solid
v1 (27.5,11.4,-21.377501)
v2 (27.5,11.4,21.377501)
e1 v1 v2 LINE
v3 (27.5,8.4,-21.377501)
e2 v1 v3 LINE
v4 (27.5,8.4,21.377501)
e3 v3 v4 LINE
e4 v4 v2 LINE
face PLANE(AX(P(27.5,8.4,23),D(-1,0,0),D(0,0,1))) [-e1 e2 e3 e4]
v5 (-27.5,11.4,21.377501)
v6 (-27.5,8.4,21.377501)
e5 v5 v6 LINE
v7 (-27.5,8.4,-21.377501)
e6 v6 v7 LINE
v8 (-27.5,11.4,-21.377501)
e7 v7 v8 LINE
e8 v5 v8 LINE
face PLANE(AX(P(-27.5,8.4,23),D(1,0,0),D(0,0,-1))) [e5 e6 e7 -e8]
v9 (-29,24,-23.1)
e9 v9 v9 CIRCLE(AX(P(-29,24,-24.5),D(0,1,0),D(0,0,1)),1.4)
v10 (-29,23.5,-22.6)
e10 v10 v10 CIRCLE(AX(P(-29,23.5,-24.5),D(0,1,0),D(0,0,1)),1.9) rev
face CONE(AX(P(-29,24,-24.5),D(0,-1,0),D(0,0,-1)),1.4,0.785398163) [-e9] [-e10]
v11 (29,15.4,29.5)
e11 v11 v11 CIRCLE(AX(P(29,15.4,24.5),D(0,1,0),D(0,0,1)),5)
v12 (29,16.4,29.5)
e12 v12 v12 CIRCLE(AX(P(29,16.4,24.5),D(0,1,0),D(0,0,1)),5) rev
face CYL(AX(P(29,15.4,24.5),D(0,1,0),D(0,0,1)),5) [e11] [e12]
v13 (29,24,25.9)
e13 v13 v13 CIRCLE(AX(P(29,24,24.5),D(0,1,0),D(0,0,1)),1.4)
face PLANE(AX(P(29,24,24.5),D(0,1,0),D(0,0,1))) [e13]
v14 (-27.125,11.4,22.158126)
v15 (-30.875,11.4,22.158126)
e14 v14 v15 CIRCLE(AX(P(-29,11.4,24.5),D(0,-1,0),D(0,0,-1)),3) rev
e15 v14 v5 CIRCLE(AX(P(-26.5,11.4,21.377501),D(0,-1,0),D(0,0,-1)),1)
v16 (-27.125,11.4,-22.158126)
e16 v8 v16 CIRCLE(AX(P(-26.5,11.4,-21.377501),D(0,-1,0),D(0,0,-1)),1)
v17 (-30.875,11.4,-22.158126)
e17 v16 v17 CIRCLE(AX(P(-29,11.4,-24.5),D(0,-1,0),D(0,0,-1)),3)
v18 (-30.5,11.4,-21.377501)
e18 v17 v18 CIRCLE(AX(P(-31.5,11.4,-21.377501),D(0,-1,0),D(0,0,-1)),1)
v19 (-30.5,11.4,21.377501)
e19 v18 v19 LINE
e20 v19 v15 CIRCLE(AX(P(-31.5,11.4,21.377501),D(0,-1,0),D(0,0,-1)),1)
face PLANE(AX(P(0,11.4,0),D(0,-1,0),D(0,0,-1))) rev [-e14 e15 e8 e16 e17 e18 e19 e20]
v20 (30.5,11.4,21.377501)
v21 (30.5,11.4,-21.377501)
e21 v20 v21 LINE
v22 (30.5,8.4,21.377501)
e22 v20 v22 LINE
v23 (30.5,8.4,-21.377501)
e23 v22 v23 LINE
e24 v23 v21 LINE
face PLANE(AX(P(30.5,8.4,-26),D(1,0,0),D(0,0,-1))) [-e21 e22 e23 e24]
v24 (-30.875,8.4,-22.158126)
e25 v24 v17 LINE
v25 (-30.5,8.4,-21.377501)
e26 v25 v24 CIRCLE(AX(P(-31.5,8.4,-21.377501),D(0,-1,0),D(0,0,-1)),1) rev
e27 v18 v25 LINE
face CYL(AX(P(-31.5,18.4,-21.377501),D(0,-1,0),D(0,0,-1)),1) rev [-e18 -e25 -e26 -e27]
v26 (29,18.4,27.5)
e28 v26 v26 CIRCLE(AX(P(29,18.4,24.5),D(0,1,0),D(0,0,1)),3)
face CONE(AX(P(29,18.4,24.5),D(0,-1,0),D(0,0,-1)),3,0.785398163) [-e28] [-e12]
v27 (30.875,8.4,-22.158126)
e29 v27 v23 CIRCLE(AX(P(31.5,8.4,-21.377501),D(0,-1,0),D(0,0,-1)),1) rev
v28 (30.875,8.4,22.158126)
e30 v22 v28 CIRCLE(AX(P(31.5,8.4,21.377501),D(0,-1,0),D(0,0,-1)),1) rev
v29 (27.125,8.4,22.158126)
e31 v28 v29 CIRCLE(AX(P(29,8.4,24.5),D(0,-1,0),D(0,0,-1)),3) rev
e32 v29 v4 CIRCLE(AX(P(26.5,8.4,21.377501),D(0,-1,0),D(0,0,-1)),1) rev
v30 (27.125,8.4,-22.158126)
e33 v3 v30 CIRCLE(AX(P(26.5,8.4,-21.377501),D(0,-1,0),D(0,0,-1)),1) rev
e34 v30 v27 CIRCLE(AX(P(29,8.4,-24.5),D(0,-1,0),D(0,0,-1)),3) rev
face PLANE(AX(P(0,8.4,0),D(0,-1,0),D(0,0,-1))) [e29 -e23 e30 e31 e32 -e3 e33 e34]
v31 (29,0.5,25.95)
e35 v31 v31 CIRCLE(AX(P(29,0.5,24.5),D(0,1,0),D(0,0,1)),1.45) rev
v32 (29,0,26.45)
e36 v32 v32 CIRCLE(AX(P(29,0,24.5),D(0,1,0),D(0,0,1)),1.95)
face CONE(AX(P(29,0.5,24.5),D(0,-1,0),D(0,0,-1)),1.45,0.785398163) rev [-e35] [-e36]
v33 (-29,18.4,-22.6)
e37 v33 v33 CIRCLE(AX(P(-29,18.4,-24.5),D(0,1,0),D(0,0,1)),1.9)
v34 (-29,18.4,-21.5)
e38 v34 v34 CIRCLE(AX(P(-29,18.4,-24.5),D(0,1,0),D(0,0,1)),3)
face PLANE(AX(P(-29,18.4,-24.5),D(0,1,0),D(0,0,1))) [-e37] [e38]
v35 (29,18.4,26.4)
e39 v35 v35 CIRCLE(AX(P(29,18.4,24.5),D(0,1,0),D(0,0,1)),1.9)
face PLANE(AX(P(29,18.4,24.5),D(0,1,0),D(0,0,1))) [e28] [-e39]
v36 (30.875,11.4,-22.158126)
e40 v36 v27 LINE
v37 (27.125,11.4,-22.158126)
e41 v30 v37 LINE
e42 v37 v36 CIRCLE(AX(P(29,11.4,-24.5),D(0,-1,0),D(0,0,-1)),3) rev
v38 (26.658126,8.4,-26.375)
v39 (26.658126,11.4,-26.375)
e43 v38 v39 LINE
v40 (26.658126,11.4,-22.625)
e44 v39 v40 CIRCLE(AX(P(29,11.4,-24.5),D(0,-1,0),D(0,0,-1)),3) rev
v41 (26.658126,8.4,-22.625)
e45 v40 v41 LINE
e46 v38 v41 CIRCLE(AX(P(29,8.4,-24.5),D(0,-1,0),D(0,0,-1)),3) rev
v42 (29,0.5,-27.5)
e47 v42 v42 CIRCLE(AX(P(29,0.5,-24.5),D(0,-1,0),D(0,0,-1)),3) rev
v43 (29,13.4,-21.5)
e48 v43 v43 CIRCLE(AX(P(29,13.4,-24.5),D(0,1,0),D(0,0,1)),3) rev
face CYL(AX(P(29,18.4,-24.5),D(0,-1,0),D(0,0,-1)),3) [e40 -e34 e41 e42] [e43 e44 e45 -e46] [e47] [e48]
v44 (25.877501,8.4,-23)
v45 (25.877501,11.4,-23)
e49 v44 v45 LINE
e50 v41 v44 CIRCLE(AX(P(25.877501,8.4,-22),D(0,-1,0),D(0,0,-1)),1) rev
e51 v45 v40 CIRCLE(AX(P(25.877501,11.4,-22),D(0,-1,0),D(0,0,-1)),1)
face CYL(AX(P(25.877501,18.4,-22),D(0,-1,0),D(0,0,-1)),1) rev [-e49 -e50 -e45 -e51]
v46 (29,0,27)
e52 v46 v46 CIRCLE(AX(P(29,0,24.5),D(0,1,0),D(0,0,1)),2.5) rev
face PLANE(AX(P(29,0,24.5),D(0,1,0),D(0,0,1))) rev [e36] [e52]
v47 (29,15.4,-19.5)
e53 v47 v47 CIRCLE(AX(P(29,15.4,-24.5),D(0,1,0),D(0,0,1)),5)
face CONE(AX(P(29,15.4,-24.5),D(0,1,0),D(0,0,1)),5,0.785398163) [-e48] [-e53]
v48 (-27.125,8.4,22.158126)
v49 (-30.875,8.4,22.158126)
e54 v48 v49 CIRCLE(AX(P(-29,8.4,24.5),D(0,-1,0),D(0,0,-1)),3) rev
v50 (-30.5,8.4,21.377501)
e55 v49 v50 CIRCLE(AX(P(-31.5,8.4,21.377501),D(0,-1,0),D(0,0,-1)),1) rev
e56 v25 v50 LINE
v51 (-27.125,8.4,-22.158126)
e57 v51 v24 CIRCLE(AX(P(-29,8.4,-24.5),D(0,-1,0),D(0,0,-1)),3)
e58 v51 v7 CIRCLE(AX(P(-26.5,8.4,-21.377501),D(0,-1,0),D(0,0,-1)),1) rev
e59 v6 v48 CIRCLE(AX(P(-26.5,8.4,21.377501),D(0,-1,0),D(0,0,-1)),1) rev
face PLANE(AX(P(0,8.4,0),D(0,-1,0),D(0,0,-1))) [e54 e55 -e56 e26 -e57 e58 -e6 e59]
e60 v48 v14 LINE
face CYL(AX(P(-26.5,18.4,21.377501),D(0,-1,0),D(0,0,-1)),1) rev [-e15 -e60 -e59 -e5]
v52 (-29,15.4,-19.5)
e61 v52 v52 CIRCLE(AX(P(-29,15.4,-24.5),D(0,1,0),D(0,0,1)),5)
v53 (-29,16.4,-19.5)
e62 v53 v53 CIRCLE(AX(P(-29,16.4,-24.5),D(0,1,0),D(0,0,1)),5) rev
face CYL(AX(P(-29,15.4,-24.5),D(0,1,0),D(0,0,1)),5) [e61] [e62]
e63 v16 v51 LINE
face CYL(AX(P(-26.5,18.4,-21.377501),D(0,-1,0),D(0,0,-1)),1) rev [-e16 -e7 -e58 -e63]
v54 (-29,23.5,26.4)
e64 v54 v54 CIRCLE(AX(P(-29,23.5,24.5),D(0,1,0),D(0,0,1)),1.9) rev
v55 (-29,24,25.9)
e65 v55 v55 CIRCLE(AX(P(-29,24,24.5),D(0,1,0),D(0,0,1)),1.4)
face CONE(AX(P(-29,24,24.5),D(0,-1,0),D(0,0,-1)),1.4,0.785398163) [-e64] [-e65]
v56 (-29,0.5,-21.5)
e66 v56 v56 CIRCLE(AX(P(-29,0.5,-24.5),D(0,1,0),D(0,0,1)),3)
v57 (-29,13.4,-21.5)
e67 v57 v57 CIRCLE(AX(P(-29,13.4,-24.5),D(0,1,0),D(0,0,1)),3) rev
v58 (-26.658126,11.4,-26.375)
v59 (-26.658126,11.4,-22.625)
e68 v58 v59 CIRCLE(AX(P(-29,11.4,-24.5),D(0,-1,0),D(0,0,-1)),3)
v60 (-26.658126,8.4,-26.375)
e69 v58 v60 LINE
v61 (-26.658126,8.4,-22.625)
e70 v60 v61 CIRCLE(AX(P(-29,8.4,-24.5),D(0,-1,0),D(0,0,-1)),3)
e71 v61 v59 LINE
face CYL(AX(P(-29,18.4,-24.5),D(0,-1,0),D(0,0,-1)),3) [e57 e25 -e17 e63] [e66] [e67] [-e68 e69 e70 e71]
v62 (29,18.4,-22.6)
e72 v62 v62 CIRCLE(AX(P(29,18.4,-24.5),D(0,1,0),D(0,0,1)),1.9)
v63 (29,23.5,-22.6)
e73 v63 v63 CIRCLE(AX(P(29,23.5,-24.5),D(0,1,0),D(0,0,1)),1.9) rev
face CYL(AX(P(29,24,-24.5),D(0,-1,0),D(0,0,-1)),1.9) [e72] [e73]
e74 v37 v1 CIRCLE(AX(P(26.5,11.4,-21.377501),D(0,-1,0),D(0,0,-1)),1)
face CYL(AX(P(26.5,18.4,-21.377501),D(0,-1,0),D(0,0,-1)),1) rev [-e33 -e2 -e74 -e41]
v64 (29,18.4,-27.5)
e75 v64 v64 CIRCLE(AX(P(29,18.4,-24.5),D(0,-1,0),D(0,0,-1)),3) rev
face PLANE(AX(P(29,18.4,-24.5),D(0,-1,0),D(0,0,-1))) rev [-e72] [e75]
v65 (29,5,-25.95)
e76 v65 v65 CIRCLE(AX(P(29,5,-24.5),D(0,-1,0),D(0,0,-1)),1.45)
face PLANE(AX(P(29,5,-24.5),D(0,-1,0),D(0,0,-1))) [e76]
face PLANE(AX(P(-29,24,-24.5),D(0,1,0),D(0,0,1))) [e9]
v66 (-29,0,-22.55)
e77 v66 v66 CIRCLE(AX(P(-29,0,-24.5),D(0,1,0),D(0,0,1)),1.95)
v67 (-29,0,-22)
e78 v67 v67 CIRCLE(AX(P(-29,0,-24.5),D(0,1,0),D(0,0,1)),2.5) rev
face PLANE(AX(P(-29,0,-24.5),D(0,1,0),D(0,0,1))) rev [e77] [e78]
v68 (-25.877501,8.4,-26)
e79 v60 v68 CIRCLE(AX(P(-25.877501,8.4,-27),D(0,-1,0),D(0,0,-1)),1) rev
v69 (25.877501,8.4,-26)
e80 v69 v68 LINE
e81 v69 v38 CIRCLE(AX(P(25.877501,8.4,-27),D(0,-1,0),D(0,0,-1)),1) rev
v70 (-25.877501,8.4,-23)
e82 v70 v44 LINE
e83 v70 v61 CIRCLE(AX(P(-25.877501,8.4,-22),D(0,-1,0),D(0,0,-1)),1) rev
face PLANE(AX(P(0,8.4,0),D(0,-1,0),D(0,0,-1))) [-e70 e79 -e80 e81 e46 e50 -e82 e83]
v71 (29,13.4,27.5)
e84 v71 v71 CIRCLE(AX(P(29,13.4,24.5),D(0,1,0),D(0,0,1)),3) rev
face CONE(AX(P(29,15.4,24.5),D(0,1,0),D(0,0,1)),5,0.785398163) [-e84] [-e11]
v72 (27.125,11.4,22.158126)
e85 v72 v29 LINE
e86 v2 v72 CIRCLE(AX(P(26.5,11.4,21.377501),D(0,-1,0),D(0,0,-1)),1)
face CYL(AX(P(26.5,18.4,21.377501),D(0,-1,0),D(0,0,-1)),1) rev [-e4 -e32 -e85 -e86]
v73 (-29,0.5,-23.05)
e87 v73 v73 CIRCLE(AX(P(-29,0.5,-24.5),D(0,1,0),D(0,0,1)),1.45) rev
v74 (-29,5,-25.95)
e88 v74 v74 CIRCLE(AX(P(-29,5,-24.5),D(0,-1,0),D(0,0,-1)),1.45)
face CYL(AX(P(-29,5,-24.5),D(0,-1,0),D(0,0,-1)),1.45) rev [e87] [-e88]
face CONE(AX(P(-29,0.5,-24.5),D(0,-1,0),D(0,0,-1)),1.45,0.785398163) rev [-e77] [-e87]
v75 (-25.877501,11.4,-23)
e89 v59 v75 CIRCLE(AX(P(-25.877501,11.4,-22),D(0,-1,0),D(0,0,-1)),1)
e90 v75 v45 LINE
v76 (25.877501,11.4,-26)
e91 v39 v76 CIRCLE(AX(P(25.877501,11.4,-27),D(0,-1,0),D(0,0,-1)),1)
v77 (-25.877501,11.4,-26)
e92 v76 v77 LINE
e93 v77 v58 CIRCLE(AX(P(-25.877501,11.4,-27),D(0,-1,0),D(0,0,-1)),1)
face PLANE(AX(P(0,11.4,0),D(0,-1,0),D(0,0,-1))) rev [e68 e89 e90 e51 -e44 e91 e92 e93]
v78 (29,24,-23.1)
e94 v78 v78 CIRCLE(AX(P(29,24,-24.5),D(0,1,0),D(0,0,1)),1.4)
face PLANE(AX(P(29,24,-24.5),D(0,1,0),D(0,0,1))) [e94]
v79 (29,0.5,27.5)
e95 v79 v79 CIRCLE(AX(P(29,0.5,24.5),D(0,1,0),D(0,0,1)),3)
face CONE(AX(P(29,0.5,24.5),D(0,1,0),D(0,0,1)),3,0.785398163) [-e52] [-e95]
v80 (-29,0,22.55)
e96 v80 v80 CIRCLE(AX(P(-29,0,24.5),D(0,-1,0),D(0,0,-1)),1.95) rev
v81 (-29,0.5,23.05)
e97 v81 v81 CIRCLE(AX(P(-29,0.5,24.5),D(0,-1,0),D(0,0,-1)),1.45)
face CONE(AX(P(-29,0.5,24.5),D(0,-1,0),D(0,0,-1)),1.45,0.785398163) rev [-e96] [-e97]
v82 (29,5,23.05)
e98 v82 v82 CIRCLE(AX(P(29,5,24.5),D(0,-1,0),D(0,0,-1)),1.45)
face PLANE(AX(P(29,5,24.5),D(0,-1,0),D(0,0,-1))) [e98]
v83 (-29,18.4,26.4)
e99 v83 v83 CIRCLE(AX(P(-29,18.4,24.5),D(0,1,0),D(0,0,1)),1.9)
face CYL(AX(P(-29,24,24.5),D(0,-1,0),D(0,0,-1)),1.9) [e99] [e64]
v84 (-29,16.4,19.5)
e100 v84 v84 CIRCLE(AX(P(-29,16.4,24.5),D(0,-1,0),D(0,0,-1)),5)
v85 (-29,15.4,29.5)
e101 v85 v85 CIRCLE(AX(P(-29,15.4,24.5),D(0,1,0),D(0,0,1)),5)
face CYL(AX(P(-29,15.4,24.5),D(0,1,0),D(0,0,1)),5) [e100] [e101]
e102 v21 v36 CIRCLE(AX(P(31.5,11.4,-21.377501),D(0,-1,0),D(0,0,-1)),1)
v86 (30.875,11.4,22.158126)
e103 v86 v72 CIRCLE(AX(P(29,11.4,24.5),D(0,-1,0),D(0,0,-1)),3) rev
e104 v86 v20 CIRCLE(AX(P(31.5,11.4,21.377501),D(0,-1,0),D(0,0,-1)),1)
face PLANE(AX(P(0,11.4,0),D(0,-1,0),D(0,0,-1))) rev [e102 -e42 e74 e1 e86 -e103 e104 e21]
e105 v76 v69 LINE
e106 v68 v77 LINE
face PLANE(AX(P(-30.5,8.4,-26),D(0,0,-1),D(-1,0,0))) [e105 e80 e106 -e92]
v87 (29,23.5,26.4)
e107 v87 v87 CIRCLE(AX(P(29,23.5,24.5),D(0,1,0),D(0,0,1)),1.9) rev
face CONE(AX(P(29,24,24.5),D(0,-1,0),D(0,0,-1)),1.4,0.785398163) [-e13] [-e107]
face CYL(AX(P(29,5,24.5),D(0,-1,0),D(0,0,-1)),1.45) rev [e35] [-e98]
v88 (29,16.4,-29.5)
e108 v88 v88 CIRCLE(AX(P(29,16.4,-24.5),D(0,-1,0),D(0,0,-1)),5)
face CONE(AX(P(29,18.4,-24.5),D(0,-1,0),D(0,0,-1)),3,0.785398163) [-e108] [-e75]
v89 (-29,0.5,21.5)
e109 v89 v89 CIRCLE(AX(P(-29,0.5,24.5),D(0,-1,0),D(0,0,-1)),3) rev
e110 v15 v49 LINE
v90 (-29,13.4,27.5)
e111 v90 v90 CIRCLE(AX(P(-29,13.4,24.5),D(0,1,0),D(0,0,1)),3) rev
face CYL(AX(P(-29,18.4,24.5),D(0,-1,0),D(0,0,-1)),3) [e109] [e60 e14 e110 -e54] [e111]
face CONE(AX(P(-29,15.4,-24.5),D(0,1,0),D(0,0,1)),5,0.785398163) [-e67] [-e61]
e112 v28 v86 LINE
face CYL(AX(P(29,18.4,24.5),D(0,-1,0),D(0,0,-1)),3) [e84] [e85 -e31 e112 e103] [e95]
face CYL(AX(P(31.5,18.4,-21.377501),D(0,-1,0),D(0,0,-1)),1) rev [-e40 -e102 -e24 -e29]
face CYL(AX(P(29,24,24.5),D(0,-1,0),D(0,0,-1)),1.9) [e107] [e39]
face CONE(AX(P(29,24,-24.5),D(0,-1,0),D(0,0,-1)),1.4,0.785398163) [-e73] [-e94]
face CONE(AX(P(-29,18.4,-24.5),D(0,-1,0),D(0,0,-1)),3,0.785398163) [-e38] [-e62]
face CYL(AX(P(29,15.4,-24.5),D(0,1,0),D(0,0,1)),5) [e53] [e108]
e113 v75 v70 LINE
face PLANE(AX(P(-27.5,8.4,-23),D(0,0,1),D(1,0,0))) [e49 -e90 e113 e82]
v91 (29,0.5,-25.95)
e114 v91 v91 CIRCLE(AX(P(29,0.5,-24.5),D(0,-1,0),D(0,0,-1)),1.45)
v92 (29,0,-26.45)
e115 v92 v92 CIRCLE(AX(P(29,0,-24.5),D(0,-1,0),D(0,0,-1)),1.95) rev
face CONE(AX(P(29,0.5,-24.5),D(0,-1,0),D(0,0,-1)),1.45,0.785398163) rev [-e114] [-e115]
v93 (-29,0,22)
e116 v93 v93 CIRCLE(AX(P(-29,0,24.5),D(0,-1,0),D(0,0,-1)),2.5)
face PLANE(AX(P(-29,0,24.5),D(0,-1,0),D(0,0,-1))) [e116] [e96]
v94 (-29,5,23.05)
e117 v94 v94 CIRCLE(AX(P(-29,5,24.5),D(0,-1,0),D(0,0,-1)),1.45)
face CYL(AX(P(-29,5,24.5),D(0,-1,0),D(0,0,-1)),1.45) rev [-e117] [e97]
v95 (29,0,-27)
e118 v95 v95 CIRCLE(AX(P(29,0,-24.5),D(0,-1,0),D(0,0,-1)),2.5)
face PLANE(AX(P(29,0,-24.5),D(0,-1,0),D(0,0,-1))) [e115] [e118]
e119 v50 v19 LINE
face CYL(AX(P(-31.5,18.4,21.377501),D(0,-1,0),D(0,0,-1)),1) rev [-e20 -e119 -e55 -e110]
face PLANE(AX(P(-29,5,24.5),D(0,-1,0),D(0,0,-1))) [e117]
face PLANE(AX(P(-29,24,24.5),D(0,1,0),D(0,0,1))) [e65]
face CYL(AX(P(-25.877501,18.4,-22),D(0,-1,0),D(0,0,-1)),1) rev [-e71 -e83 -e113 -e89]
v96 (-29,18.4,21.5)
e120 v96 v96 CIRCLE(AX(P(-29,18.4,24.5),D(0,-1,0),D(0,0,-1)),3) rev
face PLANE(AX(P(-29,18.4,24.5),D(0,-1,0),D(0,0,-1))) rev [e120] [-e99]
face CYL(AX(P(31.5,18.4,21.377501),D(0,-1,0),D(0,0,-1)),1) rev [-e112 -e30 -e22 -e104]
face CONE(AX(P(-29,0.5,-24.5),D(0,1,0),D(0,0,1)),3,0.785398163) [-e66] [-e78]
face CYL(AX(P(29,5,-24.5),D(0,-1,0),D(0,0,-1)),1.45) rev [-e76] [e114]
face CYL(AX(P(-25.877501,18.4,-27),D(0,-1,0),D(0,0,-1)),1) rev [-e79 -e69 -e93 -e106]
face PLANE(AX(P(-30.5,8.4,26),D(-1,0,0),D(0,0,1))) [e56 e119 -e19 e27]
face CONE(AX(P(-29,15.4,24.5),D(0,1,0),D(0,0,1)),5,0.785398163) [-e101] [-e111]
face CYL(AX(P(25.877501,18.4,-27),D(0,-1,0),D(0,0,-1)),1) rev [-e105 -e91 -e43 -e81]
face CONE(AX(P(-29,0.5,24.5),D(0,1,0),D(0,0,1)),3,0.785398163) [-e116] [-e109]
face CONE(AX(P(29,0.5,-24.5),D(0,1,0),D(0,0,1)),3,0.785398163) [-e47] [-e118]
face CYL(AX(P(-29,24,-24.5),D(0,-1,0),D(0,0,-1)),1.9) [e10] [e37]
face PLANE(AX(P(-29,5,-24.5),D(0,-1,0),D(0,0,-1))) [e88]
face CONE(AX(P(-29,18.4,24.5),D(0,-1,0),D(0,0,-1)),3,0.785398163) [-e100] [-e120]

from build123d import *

# Parameters (mm, degrees)
SKETCH_1_R          = 3
EXTRUDE_1_DEPTH     = 18.4
EXTRUDE_1_2_DEPTH   = 18.4
EXTRUDE_1_3_DEPTH   = 18.4
EXTRUDE_1_4_DEPTH   = 18.4
SKETCH_2_R          = 1.45
CUT_EXTRUDE_1_DEPTH = 5
SKETCH_3_R          = 5
EXTRUDE_2_DEPTH     = 3
EXTRUDE_START       = -7
EXTRUDE_3_DEPTH     = 3
CHAMFER_1_SIZE      = 0.5
SKETCH_5_R          = 1.9
EXTRUDE_4_DEPTH     = 5.6
CHAMFER_2_SIZE      = 0.5
CHAMFER_3_SIZE      = 2
FILLET_1_R          = 1


with BuildPart() as part:
    # 스케치1 → 보스-돌출1 (new body)
    with BuildSketch(Plane(origin=(0, 0, 0), x_dir=(1, 0, 0), z_dir=(0, 1, 0))):
        with Locations(Location((-29, 24.5, 0), (0, 0, 270))):
            Circle(SKETCH_1_R)
    extrude(amount=EXTRUDE_1_DEPTH)


with BuildPart() as body_2:
    # 스케치1 → Extrude 1 2 (new body)
    with BuildSketch(Plane(origin=(0, 0, 0), x_dir=(1, 0, 0), z_dir=(0, 1, 0))):
        with Locations(Location((29, 24.5, 0), (0, 0, 90))):
            Circle(SKETCH_1_R)
    extrude(amount=EXTRUDE_1_2_DEPTH)


with BuildPart() as body_3:
    # 스케치1 → Extrude 1 3 (new body)
    with BuildSketch(Plane(origin=(0, 0, 0), x_dir=(1, 0, 0), z_dir=(0, 1, 0))):
        with Locations(Location((-29, -24.5, 0), (0, 0, 90))):
            Circle(SKETCH_1_R)
    extrude(amount=EXTRUDE_1_3_DEPTH)


with BuildPart() as body_4:
    # 스케치1 → Extrude 1 4 (new body)
    with BuildSketch(Plane(origin=(0, 0, 0), x_dir=(1, 0, 0), z_dir=(0, 1, 0))):
        with Locations(Location((29, -24.5, 0), (0, 0, 270))):
            Circle(SKETCH_1_R)
    extrude(amount=EXTRUDE_1_4_DEPTH)


with BuildPart() as cut_extrude_1_tool:
    # 스케치2 → 컷-돌출1 (new body)
    with BuildSketch(Plane.XZ):
        with Locations(Location((-29, 24.5, 0), (0, 0, 270))):
            Circle(SKETCH_2_R)
        with Locations(Location((29, 24.5, 0), (0, 0, 270))):
            Circle(SKETCH_2_R)
        with Locations(Location((-29, -24.5, 0), (0, 0, 270))):
            Circle(SKETCH_2_R)
        with Locations(Location((29, -24.5, 0), (0, 0, 270))):
            Circle(SKETCH_2_R)
    extrude(amount=-CUT_EXTRUDE_1_DEPTH)


with BuildPart() as part_1:
    add(part.part)

    # 컷-돌출1: cut by cut_extrude_1_tool
    add(cut_extrude_1_tool.part, mode=Mode.SUBTRACT)



with BuildPart() as body_2_1:
    add(body_2.part)

    # 컷-돌출1: cut by cut_extrude_1_tool
    add(cut_extrude_1_tool.part, mode=Mode.SUBTRACT)


with BuildPart() as body_3_1:
    add(body_3.part)

    # 컷-돌출1: cut by cut_extrude_1_tool
    add(cut_extrude_1_tool.part, mode=Mode.SUBTRACT)


with BuildPart() as body_4_1:
    add(body_4.part)

    # 컷-돌출1: cut by cut_extrude_1_tool
    add(cut_extrude_1_tool.part, mode=Mode.SUBTRACT)


with BuildPart() as part_2:
    add(part_1.part)

    add(body_2_1.part)  # 보스-돌출2 merges body 2

    add(body_3_1.part)  # 보스-돌출2 merges body 3

    add(body_4_1.part)  # 보스-돌출2 merges body 4
    # 스케치3 → 보스-돌출2 (add)
    with BuildSketch(Plane(origin=(0, 18.4, 0), x_dir=(1, 0, 0), z_dir=(0, 1, 0))):
        with Locations(Location((29, 24.5, 0), (0, 0, 270))):
            Circle(SKETCH_3_R)
        with Locations(Location((29, -24.5, 0), (0, 0, 270))):
            Circle(SKETCH_3_R)
        with Locations(Location((-29, -24.5, 0), (0, 0, 270))):
            Circle(SKETCH_3_R)
        with Locations(Location((-29, 24.5, 0), (0, 0, 270))):
            Circle(SKETCH_3_R)
    extrude(amount=-EXTRUDE_2_DEPTH)

    # 스케치4 → 보스-돌출3 (add)
    with BuildSketch(Plane(origin=(0, 18.4, 0), x_dir=(1, 0, 0), z_dir=(0, 1, 0)).offset(EXTRUDE_START)):
        Polygon((27.5, 23), (27.5, -23), (27.5, -26), (30.5, -26), (30.5, 26), (-30.5, 26), (-30.5, -26), (-27.5, -26), (-27.5, -23), (-27.5, 23), align=None)
    extrude(amount=-EXTRUDE_3_DEPTH)

    # 모따기1
    chamfer_1_edges = [part_2.edges().sort_by_distance(p)[0] for p in [
        (-29, 0, -23.05),
        (-29, 0, -27.5),
        (29, 0, -21.5),
        (29, 0, -23.05),
        (-29, 0, 27.5),
        (-29, 0, 25.95),
        (29, 0, 21.5),
        (29, 0, 25.95),
    ]]
    chamfer(chamfer_1_edges, length=CHAMFER_1_SIZE)

    # 스케치5 → 보스-돌출4 (add)
    with BuildSketch(Plane(origin=(0, 18.4, 0), x_dir=(1, 0, 0), z_dir=(0, 1, 0))):
        with Locations(Location((29, 24.5, 0), (0, 0, 270))):
            Circle(SKETCH_5_R)
        with Locations(Location((29, -24.5, 0), (0, 0, 270))):
            Circle(SKETCH_5_R)
        with Locations(Location((-29, -24.5, 0), (0, 0, 270))):
            Circle(SKETCH_5_R)
        with Locations(Location((-29, 24.5, 0), (0, 0, 270))):
            Circle(SKETCH_5_R)
    extrude(amount=EXTRUDE_4_DEPTH)

    # 모따기2
    chamfer_2_edges = [part_2.edges().sort_by_distance(p)[0] for p in [
        (29, 24, -26.4),
        (29, 24, 22.6),
        (-29, 24, 22.6),
        (-29, 24, -26.4),
    ]]
    chamfer(chamfer_2_edges, length=CHAMFER_2_SIZE)

    # 모따기3
    chamfer_3_edges = [part_2.edges().sort_by_distance(p)[0] for p in [
        (-29, 15.4, -27.5),
        (-29, 18.4, -29.5),
        (29, 15.4, -21.5),
        (29, 18.4, -29.5),
        (-29, 15.4, 27.5),
        (-29, 18.4, 19.5),
        (29, 15.4, 21.5),
        (29, 18.4, 19.5),
    ]]
    chamfer(chamfer_3_edges, length=CHAMFER_3_SIZE - 0.0001)  # a hair under: the kernel refuses the full size

    # 필렛1
    fillet_1_edges = [part_2.edges().sort_by_distance(p)[0] for p in [
        (-30.5, 9.9, -21.901923789),
        (-27.5, 9.9, -21.901923789),
        (-26.401923789, 9.9, -26),
        (-26.401923789, 9.9, -23),
        (27.5, 9.9, -21.901923789),
        (26.401923789, 9.9, -26),
        (26.401923789, 9.9, -23),
        (30.5, 9.9, -21.901923789),
        (-27.5, 9.9, 21.901923789),
        (-30.5, 9.9, 21.901923789),
        (30.5, 9.9, 21.901923789),
        (27.5, 9.9, 21.901923789),
    ]]
    fillet(fillet_1_edges, radius=FILLET_1_R)


solid = part_2.part
